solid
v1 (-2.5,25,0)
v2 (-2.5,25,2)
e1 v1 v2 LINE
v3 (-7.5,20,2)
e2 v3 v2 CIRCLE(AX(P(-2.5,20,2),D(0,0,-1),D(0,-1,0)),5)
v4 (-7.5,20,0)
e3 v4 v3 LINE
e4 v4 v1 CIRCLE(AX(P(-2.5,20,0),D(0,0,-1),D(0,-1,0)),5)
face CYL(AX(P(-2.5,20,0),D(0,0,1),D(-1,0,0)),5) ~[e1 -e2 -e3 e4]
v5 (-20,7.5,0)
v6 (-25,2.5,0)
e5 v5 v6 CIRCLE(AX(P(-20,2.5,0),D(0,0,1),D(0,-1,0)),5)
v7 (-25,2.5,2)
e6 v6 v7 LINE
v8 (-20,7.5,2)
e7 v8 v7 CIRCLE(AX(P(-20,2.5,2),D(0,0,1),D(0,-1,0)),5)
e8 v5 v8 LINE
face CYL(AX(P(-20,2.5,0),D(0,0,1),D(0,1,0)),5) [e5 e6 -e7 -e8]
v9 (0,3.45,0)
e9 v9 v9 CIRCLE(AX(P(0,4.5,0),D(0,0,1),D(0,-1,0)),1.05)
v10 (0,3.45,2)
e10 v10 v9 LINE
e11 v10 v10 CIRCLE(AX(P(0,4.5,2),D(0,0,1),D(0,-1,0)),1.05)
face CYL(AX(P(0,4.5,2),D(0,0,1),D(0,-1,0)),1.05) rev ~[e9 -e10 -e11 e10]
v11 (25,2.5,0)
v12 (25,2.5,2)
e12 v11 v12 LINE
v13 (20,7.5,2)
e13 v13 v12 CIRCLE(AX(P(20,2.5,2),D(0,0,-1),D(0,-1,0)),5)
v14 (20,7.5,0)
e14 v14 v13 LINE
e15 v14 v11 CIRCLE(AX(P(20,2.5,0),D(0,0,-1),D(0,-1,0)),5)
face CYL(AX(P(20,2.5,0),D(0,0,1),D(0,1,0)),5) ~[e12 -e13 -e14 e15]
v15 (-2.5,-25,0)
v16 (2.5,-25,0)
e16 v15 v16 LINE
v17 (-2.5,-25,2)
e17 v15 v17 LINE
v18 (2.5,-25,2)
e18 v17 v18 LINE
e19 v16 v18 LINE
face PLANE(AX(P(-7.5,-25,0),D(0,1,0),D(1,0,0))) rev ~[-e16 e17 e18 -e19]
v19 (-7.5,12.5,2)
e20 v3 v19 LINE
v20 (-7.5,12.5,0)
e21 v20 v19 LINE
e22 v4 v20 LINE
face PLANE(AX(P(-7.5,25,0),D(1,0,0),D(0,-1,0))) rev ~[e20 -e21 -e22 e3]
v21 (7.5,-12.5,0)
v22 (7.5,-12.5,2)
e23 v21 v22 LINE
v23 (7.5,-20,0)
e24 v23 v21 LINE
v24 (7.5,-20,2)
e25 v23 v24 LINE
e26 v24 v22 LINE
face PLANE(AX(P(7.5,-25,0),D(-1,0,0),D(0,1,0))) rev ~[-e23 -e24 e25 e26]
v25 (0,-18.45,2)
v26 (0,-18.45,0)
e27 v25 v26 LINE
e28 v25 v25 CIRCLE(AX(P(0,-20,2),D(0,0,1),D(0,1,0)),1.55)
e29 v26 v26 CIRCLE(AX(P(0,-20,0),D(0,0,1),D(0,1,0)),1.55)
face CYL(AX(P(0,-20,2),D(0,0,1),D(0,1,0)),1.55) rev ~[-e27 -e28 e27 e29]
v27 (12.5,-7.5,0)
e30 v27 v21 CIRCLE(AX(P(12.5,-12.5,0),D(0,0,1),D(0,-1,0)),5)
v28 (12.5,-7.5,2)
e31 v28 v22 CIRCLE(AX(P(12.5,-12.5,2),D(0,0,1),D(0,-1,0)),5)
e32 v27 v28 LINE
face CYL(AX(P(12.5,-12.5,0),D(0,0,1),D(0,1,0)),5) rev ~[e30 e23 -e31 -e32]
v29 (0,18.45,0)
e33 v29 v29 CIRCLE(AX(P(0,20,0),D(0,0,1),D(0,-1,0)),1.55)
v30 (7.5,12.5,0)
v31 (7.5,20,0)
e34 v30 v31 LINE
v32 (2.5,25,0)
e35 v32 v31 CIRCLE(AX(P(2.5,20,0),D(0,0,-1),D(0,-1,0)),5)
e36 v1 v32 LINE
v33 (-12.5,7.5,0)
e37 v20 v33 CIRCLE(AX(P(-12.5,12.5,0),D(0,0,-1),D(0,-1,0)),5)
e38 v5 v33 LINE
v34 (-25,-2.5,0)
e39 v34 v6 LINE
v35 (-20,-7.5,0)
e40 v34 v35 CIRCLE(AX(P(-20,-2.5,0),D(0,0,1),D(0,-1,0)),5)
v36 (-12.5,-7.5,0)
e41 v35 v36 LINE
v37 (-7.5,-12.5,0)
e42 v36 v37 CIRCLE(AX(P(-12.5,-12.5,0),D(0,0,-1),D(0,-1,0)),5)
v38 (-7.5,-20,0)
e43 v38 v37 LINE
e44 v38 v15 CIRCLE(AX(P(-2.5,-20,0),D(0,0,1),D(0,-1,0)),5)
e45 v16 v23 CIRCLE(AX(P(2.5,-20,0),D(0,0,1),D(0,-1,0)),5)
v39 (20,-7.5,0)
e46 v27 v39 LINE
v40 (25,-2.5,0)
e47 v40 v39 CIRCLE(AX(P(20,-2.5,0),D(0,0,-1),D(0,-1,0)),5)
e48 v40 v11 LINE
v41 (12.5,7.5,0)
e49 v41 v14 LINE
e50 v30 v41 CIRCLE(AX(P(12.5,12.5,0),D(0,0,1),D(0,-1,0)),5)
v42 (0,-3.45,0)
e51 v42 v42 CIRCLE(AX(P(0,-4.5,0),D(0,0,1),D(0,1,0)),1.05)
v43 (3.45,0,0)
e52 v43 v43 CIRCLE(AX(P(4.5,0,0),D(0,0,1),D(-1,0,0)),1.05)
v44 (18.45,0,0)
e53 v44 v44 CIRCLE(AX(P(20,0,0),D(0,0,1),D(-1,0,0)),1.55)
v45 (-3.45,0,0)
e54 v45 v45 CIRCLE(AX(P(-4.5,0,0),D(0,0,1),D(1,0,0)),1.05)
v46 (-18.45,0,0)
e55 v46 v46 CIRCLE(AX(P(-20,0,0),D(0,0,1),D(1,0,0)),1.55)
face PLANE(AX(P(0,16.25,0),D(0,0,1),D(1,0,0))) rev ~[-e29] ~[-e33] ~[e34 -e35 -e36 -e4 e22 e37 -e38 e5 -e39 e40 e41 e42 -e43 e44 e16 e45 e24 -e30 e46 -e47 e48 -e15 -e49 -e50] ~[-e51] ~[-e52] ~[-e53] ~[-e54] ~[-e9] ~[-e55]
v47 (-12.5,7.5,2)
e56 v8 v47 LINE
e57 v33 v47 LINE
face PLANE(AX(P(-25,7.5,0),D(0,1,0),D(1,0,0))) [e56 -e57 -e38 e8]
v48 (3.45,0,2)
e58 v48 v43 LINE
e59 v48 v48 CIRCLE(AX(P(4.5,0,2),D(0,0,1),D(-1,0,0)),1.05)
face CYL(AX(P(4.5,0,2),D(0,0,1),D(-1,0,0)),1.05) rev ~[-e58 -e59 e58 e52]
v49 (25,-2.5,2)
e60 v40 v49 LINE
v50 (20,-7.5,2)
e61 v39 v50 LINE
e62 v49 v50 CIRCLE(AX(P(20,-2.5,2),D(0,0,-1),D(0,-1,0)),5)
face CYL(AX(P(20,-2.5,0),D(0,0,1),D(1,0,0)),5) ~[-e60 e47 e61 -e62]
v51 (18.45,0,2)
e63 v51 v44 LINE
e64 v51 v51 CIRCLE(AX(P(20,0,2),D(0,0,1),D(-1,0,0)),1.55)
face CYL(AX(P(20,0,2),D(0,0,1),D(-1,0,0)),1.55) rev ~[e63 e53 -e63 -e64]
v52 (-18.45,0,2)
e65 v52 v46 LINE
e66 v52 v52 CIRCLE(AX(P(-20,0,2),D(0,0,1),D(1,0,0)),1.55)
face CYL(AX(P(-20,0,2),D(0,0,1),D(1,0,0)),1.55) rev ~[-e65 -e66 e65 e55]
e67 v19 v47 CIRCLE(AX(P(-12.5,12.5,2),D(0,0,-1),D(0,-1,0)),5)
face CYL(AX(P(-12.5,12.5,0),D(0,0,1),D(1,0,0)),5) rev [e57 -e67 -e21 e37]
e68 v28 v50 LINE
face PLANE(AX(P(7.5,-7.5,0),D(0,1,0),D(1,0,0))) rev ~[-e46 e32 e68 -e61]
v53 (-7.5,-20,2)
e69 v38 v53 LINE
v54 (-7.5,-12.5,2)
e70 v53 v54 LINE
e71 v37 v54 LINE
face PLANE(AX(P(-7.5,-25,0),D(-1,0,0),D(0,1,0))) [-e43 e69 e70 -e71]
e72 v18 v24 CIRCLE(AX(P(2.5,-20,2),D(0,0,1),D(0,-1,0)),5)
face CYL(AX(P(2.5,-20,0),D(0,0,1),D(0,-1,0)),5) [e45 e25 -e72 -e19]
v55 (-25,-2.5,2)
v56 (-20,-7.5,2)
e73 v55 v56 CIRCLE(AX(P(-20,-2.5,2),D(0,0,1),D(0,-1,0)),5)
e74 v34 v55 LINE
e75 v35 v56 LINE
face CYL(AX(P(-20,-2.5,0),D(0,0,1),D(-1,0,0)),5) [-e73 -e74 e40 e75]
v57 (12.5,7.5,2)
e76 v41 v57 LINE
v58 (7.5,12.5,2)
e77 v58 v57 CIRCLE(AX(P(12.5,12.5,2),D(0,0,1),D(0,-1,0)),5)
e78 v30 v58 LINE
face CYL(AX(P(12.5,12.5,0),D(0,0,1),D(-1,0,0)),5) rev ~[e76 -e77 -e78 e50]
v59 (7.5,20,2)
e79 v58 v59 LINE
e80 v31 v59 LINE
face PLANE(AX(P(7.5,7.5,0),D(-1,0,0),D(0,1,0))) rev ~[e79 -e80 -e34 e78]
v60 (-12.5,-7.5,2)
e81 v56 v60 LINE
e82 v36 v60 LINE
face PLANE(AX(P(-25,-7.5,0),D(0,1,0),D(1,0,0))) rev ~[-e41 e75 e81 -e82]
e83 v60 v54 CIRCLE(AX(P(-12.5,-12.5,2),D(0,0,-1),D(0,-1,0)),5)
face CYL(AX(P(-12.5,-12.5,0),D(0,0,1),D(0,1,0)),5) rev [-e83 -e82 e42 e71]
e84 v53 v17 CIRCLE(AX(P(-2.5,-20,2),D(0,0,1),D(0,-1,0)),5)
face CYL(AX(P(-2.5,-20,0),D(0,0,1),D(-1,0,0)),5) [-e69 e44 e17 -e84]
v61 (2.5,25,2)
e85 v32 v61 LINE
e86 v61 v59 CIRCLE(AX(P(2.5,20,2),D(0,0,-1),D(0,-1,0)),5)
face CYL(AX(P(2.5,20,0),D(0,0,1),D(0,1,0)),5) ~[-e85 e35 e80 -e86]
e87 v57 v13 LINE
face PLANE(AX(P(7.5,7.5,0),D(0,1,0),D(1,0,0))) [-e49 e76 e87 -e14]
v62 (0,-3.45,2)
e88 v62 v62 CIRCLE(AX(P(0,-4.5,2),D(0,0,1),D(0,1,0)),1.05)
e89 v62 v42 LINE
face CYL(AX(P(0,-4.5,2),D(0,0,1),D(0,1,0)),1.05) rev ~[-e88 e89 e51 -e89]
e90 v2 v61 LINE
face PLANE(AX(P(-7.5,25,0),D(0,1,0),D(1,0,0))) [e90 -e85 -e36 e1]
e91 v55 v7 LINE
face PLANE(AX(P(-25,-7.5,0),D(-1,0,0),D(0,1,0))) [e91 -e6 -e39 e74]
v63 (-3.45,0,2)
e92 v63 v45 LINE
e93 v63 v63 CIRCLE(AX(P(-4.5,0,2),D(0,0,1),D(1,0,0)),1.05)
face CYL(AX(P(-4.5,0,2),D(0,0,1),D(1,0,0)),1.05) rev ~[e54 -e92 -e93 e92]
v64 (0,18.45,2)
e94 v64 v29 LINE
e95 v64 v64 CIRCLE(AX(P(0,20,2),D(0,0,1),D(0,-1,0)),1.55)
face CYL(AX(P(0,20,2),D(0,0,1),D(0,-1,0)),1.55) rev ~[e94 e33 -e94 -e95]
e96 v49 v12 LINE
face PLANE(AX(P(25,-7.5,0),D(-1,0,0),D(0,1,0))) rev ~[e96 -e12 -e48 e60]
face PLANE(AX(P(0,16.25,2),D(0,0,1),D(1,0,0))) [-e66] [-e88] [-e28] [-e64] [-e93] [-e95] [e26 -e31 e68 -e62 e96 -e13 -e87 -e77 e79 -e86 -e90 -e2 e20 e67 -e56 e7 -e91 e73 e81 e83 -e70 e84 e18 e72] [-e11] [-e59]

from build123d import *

# Parameters (mm, degrees)
F0_W            = 15
F0_H            = 17.5
F0_H_2          = 15
F0_W_2          = 17.5
F1_DEPTH        = 2
F2_R            = 1.05
F2_R_2          = 1.55
F3_DEPTH        = 25
F3_COPIES_COUNT = 4
F4_R            = 5


# Not quite as in the source:
# - a pattern or mirror of a feature is missing from the dataset's text; its kind, count and spacing are read off the source's solid


with BuildPart() as f1:
    # F0 (on Top) → F1 (new body)
    with BuildSketch(Plane.XY):
        with Locations((0, 16.25)):
            Rectangle(F0_W, F0_H)
        Rectangle(F0_W, F0_H_2)
        with Locations((-16.25, 0)):
            Rectangle(F0_W_2, F0_H_2)
        with Locations((16.25, 0)):
            Rectangle(F0_W_2, F0_H_2)
        with Locations((0, -16.25)):
            Rectangle(F0_W, F0_H)
    extrude(amount=F1_DEPTH)

    # F2 (on face) → F3 (cut)
    with BuildSketch(Plane.XY.offset(2)):
        with Locations((-4.5, 0)):
            Circle(F2_R)
        with Locations((-20, 0)):
            Circle(F2_R_2)
    f3 = extrude(amount=-F3_DEPTH, mode=Mode.SUBTRACT)

    # F3_copies: F3 ×4 about axis
    f3_copies_axis = Axis((0, 0, 0), (0, 0, 1))
    for i in range(1, F3_COPIES_COUNT):
        add(f3.rotate(f3_copies_axis, i * 360 / F3_COPIES_COUNT), mode=Mode.SUBTRACT)

    # F4
    f4_edges = [f1.edges().sort_by_distance(p)[0] for p in [
        (7.5, -25, 1),
        (-7.5, -25, 1),
        (-7.5, -7.5, 1),
        (-25, -7.5, 1),
        (-25, 7.5, 1),
        (-7.5, 7.5, 1),
        (-7.5, 25, 1),
        (7.5, 25, 1),
        (25, 7.5, 1),
        (7.5, 7.5, 1),
        (25, -7.5, 1),
        (7.5, -7.5, 1),
    ]]
    fillet(f4_edges, radius=F4_R)


solid = f1.part
